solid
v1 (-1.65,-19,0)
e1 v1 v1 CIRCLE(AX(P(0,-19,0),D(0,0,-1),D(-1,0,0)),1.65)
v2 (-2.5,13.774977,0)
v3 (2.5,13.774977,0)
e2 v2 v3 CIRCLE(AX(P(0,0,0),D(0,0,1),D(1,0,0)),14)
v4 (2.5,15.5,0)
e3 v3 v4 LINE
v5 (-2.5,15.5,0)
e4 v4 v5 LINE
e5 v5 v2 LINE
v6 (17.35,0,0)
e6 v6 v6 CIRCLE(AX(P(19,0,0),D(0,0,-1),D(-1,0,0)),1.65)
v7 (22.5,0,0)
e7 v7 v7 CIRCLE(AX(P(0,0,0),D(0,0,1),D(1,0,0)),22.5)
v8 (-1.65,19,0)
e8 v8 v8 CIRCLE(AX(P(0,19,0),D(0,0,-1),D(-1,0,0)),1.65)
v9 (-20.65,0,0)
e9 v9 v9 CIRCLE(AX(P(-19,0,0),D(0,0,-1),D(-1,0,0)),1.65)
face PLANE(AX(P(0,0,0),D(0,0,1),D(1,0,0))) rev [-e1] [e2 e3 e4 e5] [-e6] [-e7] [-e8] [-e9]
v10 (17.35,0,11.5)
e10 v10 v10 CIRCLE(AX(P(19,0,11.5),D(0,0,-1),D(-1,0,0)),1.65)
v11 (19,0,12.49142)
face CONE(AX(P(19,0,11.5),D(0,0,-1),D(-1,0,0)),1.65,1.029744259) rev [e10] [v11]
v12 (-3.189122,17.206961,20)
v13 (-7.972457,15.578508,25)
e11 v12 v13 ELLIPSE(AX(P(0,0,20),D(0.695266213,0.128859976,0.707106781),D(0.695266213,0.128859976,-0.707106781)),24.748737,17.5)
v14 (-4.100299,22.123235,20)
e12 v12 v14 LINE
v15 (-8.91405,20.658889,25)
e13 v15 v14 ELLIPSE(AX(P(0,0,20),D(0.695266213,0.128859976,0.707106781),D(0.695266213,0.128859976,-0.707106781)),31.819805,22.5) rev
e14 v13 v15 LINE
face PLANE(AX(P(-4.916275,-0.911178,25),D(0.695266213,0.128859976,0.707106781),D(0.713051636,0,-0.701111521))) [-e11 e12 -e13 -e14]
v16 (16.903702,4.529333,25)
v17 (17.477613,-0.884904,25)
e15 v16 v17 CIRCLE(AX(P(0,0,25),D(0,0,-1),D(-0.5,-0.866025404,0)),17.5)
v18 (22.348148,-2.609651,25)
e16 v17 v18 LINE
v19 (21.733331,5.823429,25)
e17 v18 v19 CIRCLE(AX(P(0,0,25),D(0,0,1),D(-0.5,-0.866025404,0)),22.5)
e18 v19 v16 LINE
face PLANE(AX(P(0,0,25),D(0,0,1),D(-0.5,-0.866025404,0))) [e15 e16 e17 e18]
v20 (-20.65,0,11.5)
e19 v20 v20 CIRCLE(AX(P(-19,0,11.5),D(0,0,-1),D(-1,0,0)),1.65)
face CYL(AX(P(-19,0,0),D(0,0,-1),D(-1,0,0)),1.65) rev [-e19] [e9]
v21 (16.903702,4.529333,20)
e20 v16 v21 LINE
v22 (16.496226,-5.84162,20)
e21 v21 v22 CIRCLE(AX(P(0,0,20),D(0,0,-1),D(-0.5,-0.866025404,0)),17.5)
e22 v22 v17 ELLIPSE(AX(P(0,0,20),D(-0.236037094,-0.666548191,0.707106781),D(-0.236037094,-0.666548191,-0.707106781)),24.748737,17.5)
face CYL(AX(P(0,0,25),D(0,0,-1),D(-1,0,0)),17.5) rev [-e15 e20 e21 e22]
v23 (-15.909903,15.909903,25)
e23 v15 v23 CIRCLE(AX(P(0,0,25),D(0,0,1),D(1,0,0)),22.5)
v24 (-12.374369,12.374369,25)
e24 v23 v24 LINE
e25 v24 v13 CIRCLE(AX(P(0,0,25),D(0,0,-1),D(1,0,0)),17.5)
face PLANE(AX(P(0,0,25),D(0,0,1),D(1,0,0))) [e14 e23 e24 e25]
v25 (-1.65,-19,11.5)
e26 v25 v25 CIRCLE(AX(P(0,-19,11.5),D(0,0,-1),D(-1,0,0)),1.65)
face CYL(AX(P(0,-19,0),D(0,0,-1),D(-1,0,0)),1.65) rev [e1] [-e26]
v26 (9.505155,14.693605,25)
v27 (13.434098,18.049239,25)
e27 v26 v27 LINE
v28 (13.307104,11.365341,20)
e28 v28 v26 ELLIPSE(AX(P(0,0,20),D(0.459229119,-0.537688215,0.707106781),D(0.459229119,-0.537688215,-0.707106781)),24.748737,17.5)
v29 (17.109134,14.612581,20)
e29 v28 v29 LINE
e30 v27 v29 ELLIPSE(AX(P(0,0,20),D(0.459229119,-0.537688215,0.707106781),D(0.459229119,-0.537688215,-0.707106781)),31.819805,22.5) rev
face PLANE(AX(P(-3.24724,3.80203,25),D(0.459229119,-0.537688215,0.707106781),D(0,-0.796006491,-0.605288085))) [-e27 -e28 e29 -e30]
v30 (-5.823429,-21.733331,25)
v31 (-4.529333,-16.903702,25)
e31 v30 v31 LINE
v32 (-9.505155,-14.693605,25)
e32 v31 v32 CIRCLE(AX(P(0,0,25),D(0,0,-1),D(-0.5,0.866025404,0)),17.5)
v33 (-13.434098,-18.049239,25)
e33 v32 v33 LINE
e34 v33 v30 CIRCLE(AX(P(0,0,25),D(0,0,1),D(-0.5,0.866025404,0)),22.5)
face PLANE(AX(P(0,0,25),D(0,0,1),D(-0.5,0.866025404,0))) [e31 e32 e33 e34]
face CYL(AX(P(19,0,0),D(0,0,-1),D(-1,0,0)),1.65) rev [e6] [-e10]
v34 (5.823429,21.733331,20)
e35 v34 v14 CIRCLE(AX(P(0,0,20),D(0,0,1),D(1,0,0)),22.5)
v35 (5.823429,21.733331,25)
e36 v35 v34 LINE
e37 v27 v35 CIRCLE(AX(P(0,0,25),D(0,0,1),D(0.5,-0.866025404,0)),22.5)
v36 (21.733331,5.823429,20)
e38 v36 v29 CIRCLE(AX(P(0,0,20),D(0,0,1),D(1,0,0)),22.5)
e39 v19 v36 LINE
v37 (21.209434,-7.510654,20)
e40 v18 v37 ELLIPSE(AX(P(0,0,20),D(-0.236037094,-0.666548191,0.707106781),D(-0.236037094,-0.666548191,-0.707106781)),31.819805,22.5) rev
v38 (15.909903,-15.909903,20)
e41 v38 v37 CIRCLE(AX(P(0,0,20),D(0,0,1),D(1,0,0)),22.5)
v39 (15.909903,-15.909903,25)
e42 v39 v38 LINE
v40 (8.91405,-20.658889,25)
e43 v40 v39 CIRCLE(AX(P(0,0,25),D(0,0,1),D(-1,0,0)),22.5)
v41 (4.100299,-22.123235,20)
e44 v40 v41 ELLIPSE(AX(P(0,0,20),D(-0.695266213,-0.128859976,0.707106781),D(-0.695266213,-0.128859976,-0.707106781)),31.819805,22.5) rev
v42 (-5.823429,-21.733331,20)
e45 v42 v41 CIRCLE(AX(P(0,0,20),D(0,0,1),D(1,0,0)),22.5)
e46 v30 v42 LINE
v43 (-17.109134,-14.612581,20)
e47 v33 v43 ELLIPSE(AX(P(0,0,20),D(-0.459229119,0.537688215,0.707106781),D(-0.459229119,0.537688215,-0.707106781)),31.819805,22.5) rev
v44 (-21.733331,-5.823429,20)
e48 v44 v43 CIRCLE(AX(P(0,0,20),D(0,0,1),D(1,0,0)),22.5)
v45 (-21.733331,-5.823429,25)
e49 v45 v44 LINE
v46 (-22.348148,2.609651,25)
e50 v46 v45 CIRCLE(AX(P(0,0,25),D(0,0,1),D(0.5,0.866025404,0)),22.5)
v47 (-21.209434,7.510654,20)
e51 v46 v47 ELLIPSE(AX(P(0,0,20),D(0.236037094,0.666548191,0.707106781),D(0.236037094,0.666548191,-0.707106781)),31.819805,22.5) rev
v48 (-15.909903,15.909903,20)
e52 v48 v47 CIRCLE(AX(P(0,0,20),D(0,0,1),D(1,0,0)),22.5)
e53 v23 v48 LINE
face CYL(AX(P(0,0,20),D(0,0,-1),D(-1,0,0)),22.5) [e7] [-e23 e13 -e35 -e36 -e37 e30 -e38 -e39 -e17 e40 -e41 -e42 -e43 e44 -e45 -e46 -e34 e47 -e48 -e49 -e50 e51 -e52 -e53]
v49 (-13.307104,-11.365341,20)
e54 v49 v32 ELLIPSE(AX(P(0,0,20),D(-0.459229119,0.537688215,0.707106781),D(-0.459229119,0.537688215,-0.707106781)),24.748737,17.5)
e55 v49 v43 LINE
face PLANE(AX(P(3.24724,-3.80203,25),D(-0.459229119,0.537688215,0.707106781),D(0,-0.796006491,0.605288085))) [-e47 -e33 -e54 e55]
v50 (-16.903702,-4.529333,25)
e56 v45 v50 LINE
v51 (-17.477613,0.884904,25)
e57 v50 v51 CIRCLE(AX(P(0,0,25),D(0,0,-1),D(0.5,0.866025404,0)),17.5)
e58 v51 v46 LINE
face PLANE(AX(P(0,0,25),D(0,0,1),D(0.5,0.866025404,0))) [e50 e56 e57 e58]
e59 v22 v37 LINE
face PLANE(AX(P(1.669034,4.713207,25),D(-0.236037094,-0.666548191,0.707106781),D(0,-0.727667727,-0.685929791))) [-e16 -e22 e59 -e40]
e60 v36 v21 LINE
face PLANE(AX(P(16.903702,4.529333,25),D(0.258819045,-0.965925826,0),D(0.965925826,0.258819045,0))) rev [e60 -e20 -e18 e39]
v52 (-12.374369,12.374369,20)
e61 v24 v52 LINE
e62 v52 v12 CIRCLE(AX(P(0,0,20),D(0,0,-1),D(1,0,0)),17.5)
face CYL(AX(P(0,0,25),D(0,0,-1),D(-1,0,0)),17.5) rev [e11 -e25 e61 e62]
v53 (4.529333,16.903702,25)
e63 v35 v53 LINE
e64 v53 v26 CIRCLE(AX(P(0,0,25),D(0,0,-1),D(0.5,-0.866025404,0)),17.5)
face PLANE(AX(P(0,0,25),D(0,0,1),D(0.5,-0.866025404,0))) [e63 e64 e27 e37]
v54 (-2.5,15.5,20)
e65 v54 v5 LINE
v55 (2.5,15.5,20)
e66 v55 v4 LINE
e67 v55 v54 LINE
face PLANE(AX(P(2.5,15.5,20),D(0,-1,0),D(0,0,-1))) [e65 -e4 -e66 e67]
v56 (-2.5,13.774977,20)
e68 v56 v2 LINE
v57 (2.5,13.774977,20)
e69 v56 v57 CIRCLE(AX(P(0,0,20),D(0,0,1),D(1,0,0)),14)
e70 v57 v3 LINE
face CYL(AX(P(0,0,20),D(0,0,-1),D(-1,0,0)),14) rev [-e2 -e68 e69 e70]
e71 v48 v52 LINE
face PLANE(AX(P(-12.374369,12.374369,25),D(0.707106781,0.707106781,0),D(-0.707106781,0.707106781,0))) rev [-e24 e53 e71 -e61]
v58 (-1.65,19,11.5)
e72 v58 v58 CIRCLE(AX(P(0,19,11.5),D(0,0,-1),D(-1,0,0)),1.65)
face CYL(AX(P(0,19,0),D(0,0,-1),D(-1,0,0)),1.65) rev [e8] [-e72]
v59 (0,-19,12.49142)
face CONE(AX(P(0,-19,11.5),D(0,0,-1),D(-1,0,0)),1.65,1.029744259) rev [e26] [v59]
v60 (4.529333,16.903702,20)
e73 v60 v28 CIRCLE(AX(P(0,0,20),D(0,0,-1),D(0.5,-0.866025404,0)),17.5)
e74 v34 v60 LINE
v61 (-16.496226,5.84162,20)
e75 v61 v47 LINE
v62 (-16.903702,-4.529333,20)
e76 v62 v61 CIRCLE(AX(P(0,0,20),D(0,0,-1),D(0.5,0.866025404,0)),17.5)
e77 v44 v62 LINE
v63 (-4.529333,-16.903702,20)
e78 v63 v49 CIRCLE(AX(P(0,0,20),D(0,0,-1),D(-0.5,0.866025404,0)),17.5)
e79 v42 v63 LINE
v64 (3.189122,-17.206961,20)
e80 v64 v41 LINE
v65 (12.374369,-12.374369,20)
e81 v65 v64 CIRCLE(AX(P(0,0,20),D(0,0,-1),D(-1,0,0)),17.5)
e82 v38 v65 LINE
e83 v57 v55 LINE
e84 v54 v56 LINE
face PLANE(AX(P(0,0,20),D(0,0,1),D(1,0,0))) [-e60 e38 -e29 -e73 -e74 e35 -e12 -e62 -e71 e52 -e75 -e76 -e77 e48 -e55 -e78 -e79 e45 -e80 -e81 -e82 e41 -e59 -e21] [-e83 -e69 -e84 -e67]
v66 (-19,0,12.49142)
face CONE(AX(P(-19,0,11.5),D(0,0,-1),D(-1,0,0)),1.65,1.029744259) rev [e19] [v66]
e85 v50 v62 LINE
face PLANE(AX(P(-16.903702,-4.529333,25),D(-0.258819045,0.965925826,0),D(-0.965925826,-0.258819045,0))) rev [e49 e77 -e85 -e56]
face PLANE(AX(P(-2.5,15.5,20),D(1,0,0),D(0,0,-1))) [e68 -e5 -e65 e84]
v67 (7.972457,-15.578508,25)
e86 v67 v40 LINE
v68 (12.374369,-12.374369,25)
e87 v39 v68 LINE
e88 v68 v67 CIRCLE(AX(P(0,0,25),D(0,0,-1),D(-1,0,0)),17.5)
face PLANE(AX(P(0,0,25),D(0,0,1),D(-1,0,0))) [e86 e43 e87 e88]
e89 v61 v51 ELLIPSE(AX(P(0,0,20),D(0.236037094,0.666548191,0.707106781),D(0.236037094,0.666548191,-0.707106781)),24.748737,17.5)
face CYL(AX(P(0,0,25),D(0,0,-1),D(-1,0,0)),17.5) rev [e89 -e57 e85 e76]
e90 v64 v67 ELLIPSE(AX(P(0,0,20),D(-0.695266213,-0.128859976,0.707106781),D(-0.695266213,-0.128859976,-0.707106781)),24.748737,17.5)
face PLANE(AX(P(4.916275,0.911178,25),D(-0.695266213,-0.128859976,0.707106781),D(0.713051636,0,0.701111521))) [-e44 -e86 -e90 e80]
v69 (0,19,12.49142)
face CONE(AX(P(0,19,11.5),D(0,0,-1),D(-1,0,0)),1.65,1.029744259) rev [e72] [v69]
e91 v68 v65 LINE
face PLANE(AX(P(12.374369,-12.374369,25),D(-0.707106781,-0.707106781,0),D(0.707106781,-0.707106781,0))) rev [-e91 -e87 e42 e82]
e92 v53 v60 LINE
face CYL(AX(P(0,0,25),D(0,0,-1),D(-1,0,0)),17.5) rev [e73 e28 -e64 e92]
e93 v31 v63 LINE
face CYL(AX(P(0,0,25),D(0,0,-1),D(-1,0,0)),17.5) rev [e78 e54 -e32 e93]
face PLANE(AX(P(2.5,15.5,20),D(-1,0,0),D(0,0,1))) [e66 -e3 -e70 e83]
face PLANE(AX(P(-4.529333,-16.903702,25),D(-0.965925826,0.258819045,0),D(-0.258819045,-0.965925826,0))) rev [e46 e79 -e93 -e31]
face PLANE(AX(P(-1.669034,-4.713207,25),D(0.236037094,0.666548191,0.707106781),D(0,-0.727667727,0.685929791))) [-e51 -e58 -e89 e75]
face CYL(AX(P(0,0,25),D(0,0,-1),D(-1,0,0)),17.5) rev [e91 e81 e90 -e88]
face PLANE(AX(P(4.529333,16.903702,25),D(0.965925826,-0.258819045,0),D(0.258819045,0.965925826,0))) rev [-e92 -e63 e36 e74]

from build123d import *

# Parameters (mm, degrees)
SKETCH1_R                    = 22.5
BOSS_EXTRUDE1_DEPTH          = 20
BOSS_EXTRUDE2_DEPTH          = 5
CHAMFER2_SIZE                = 5
CIRPATTERN1_COUNT            = 6
CHAMFER2_OF_CIRPATTERN1_SIZE = 5
CIRPATTERN2_COUNT            = 4


with BuildPart() as part:
    # Sketch1 → Boss-Extrude1 (new body)
    with BuildSketch(Plane.XY):
        Circle(SKETCH1_R)
        with BuildLine():
            Line((2.5, 15.5), (-2.5, 15.5))
            Line((-2.5, 15.5), (-2.5, 13.774977314))
            ThreePointArc((-2.5, 13.774977314), (0, -14), (2.5, 13.774977314))
            Line((2.5, 13.774977314), (2.5, 15.5))
        make_face(mode=Mode.SUBTRACT)
    extrude(amount=BOSS_EXTRUDE1_DEPTH)

    # Sketch2 → Boss-Extrude2 (add)
    with BuildSketch(Plane.XY.offset(20)):
        with BuildLine():
            Line((-3.189121696, 17.206960882), (-4.100299324, 22.12323542))
            ThreePointArc((-4.100299324, 22.12323542), (-10.476326707, 19.912221843), (-15.909902577, 15.909902577))
            Line((-15.909902577, 15.909902577), (-12.374368671, 12.374368671))
            ThreePointArc((-12.374368671, 12.374368671), (-8.148254106, 15.487283656), (-3.189121696, 17.206960882))
        make_face()
    boss_extrude2 = extrude(amount=BOSS_EXTRUDE2_DEPTH)

    # Chamfer2
    chamfer2_edges = [part.edges().sort_by_distance(p)[0] for p in [
        (-3.64471051, 19.665098151, 25),
    ]]
    chamfer(chamfer2_edges, length=CHAMFER2_SIZE - 0.0001)  # a hair under: the kernel refuses the full size

    # CirPattern1: Boss-Extrude2 ×6 about axis
    cirpattern1_axis = Axis((0, 0, 0), (0, 0, 1))
    for i in range(1, CIRPATTERN1_COUNT):
        add(boss_extrude2.rotate(cirpattern1_axis, i * 360 / CIRPATTERN1_COUNT))

    # Chamfer2 of CirPattern1
    chamfer2_of_cirpattern1_edges = [part.edges().sort_by_distance(p)[0] for p in [
        (-18.852829822, 6.676137185, 25),
        (-15.208119312, -12.988960967, 25),
        (3.64471051, -19.665098151, 25),
        (18.852829822, -6.676137185, 25),
        (15.208119312, 12.988960967, 25),
    ]]
    chamfer(chamfer2_of_cirpattern1_edges, length=CHAMFER2_OF_CIRPATTERN1_SIZE - 0.0001)  # a hair under: the kernel refuses the full size

    # Sketch4 → M4 Tapped Hole1 (revolve, cut)
    with BuildSketch(Plane(origin=(0, 19, 0), x_dir=(0, 1, 0), z_dir=(1, 0, 0))):
        Polygon((0, 0), (0, 12.491420021), (1.65, 11.5), (1.65, 0), align=None)
    m4_tapped_hole1 = revolve(axis=Axis((0, 19, -6.35), (0, 0, 1)), mode=Mode.SUBTRACT)

    # CirPattern2: M4 Tapped Hole1 ×4 about axis
    cirpattern2_axis = Axis((0, 0, 0), (0, 0, 1))
    for i in range(1, CIRPATTERN2_COUNT):
        add(m4_tapped_hole1.rotate(cirpattern2_axis, i * 360 / CIRPATTERN2_COUNT), mode=Mode.SUBTRACT)


solid = part.part
